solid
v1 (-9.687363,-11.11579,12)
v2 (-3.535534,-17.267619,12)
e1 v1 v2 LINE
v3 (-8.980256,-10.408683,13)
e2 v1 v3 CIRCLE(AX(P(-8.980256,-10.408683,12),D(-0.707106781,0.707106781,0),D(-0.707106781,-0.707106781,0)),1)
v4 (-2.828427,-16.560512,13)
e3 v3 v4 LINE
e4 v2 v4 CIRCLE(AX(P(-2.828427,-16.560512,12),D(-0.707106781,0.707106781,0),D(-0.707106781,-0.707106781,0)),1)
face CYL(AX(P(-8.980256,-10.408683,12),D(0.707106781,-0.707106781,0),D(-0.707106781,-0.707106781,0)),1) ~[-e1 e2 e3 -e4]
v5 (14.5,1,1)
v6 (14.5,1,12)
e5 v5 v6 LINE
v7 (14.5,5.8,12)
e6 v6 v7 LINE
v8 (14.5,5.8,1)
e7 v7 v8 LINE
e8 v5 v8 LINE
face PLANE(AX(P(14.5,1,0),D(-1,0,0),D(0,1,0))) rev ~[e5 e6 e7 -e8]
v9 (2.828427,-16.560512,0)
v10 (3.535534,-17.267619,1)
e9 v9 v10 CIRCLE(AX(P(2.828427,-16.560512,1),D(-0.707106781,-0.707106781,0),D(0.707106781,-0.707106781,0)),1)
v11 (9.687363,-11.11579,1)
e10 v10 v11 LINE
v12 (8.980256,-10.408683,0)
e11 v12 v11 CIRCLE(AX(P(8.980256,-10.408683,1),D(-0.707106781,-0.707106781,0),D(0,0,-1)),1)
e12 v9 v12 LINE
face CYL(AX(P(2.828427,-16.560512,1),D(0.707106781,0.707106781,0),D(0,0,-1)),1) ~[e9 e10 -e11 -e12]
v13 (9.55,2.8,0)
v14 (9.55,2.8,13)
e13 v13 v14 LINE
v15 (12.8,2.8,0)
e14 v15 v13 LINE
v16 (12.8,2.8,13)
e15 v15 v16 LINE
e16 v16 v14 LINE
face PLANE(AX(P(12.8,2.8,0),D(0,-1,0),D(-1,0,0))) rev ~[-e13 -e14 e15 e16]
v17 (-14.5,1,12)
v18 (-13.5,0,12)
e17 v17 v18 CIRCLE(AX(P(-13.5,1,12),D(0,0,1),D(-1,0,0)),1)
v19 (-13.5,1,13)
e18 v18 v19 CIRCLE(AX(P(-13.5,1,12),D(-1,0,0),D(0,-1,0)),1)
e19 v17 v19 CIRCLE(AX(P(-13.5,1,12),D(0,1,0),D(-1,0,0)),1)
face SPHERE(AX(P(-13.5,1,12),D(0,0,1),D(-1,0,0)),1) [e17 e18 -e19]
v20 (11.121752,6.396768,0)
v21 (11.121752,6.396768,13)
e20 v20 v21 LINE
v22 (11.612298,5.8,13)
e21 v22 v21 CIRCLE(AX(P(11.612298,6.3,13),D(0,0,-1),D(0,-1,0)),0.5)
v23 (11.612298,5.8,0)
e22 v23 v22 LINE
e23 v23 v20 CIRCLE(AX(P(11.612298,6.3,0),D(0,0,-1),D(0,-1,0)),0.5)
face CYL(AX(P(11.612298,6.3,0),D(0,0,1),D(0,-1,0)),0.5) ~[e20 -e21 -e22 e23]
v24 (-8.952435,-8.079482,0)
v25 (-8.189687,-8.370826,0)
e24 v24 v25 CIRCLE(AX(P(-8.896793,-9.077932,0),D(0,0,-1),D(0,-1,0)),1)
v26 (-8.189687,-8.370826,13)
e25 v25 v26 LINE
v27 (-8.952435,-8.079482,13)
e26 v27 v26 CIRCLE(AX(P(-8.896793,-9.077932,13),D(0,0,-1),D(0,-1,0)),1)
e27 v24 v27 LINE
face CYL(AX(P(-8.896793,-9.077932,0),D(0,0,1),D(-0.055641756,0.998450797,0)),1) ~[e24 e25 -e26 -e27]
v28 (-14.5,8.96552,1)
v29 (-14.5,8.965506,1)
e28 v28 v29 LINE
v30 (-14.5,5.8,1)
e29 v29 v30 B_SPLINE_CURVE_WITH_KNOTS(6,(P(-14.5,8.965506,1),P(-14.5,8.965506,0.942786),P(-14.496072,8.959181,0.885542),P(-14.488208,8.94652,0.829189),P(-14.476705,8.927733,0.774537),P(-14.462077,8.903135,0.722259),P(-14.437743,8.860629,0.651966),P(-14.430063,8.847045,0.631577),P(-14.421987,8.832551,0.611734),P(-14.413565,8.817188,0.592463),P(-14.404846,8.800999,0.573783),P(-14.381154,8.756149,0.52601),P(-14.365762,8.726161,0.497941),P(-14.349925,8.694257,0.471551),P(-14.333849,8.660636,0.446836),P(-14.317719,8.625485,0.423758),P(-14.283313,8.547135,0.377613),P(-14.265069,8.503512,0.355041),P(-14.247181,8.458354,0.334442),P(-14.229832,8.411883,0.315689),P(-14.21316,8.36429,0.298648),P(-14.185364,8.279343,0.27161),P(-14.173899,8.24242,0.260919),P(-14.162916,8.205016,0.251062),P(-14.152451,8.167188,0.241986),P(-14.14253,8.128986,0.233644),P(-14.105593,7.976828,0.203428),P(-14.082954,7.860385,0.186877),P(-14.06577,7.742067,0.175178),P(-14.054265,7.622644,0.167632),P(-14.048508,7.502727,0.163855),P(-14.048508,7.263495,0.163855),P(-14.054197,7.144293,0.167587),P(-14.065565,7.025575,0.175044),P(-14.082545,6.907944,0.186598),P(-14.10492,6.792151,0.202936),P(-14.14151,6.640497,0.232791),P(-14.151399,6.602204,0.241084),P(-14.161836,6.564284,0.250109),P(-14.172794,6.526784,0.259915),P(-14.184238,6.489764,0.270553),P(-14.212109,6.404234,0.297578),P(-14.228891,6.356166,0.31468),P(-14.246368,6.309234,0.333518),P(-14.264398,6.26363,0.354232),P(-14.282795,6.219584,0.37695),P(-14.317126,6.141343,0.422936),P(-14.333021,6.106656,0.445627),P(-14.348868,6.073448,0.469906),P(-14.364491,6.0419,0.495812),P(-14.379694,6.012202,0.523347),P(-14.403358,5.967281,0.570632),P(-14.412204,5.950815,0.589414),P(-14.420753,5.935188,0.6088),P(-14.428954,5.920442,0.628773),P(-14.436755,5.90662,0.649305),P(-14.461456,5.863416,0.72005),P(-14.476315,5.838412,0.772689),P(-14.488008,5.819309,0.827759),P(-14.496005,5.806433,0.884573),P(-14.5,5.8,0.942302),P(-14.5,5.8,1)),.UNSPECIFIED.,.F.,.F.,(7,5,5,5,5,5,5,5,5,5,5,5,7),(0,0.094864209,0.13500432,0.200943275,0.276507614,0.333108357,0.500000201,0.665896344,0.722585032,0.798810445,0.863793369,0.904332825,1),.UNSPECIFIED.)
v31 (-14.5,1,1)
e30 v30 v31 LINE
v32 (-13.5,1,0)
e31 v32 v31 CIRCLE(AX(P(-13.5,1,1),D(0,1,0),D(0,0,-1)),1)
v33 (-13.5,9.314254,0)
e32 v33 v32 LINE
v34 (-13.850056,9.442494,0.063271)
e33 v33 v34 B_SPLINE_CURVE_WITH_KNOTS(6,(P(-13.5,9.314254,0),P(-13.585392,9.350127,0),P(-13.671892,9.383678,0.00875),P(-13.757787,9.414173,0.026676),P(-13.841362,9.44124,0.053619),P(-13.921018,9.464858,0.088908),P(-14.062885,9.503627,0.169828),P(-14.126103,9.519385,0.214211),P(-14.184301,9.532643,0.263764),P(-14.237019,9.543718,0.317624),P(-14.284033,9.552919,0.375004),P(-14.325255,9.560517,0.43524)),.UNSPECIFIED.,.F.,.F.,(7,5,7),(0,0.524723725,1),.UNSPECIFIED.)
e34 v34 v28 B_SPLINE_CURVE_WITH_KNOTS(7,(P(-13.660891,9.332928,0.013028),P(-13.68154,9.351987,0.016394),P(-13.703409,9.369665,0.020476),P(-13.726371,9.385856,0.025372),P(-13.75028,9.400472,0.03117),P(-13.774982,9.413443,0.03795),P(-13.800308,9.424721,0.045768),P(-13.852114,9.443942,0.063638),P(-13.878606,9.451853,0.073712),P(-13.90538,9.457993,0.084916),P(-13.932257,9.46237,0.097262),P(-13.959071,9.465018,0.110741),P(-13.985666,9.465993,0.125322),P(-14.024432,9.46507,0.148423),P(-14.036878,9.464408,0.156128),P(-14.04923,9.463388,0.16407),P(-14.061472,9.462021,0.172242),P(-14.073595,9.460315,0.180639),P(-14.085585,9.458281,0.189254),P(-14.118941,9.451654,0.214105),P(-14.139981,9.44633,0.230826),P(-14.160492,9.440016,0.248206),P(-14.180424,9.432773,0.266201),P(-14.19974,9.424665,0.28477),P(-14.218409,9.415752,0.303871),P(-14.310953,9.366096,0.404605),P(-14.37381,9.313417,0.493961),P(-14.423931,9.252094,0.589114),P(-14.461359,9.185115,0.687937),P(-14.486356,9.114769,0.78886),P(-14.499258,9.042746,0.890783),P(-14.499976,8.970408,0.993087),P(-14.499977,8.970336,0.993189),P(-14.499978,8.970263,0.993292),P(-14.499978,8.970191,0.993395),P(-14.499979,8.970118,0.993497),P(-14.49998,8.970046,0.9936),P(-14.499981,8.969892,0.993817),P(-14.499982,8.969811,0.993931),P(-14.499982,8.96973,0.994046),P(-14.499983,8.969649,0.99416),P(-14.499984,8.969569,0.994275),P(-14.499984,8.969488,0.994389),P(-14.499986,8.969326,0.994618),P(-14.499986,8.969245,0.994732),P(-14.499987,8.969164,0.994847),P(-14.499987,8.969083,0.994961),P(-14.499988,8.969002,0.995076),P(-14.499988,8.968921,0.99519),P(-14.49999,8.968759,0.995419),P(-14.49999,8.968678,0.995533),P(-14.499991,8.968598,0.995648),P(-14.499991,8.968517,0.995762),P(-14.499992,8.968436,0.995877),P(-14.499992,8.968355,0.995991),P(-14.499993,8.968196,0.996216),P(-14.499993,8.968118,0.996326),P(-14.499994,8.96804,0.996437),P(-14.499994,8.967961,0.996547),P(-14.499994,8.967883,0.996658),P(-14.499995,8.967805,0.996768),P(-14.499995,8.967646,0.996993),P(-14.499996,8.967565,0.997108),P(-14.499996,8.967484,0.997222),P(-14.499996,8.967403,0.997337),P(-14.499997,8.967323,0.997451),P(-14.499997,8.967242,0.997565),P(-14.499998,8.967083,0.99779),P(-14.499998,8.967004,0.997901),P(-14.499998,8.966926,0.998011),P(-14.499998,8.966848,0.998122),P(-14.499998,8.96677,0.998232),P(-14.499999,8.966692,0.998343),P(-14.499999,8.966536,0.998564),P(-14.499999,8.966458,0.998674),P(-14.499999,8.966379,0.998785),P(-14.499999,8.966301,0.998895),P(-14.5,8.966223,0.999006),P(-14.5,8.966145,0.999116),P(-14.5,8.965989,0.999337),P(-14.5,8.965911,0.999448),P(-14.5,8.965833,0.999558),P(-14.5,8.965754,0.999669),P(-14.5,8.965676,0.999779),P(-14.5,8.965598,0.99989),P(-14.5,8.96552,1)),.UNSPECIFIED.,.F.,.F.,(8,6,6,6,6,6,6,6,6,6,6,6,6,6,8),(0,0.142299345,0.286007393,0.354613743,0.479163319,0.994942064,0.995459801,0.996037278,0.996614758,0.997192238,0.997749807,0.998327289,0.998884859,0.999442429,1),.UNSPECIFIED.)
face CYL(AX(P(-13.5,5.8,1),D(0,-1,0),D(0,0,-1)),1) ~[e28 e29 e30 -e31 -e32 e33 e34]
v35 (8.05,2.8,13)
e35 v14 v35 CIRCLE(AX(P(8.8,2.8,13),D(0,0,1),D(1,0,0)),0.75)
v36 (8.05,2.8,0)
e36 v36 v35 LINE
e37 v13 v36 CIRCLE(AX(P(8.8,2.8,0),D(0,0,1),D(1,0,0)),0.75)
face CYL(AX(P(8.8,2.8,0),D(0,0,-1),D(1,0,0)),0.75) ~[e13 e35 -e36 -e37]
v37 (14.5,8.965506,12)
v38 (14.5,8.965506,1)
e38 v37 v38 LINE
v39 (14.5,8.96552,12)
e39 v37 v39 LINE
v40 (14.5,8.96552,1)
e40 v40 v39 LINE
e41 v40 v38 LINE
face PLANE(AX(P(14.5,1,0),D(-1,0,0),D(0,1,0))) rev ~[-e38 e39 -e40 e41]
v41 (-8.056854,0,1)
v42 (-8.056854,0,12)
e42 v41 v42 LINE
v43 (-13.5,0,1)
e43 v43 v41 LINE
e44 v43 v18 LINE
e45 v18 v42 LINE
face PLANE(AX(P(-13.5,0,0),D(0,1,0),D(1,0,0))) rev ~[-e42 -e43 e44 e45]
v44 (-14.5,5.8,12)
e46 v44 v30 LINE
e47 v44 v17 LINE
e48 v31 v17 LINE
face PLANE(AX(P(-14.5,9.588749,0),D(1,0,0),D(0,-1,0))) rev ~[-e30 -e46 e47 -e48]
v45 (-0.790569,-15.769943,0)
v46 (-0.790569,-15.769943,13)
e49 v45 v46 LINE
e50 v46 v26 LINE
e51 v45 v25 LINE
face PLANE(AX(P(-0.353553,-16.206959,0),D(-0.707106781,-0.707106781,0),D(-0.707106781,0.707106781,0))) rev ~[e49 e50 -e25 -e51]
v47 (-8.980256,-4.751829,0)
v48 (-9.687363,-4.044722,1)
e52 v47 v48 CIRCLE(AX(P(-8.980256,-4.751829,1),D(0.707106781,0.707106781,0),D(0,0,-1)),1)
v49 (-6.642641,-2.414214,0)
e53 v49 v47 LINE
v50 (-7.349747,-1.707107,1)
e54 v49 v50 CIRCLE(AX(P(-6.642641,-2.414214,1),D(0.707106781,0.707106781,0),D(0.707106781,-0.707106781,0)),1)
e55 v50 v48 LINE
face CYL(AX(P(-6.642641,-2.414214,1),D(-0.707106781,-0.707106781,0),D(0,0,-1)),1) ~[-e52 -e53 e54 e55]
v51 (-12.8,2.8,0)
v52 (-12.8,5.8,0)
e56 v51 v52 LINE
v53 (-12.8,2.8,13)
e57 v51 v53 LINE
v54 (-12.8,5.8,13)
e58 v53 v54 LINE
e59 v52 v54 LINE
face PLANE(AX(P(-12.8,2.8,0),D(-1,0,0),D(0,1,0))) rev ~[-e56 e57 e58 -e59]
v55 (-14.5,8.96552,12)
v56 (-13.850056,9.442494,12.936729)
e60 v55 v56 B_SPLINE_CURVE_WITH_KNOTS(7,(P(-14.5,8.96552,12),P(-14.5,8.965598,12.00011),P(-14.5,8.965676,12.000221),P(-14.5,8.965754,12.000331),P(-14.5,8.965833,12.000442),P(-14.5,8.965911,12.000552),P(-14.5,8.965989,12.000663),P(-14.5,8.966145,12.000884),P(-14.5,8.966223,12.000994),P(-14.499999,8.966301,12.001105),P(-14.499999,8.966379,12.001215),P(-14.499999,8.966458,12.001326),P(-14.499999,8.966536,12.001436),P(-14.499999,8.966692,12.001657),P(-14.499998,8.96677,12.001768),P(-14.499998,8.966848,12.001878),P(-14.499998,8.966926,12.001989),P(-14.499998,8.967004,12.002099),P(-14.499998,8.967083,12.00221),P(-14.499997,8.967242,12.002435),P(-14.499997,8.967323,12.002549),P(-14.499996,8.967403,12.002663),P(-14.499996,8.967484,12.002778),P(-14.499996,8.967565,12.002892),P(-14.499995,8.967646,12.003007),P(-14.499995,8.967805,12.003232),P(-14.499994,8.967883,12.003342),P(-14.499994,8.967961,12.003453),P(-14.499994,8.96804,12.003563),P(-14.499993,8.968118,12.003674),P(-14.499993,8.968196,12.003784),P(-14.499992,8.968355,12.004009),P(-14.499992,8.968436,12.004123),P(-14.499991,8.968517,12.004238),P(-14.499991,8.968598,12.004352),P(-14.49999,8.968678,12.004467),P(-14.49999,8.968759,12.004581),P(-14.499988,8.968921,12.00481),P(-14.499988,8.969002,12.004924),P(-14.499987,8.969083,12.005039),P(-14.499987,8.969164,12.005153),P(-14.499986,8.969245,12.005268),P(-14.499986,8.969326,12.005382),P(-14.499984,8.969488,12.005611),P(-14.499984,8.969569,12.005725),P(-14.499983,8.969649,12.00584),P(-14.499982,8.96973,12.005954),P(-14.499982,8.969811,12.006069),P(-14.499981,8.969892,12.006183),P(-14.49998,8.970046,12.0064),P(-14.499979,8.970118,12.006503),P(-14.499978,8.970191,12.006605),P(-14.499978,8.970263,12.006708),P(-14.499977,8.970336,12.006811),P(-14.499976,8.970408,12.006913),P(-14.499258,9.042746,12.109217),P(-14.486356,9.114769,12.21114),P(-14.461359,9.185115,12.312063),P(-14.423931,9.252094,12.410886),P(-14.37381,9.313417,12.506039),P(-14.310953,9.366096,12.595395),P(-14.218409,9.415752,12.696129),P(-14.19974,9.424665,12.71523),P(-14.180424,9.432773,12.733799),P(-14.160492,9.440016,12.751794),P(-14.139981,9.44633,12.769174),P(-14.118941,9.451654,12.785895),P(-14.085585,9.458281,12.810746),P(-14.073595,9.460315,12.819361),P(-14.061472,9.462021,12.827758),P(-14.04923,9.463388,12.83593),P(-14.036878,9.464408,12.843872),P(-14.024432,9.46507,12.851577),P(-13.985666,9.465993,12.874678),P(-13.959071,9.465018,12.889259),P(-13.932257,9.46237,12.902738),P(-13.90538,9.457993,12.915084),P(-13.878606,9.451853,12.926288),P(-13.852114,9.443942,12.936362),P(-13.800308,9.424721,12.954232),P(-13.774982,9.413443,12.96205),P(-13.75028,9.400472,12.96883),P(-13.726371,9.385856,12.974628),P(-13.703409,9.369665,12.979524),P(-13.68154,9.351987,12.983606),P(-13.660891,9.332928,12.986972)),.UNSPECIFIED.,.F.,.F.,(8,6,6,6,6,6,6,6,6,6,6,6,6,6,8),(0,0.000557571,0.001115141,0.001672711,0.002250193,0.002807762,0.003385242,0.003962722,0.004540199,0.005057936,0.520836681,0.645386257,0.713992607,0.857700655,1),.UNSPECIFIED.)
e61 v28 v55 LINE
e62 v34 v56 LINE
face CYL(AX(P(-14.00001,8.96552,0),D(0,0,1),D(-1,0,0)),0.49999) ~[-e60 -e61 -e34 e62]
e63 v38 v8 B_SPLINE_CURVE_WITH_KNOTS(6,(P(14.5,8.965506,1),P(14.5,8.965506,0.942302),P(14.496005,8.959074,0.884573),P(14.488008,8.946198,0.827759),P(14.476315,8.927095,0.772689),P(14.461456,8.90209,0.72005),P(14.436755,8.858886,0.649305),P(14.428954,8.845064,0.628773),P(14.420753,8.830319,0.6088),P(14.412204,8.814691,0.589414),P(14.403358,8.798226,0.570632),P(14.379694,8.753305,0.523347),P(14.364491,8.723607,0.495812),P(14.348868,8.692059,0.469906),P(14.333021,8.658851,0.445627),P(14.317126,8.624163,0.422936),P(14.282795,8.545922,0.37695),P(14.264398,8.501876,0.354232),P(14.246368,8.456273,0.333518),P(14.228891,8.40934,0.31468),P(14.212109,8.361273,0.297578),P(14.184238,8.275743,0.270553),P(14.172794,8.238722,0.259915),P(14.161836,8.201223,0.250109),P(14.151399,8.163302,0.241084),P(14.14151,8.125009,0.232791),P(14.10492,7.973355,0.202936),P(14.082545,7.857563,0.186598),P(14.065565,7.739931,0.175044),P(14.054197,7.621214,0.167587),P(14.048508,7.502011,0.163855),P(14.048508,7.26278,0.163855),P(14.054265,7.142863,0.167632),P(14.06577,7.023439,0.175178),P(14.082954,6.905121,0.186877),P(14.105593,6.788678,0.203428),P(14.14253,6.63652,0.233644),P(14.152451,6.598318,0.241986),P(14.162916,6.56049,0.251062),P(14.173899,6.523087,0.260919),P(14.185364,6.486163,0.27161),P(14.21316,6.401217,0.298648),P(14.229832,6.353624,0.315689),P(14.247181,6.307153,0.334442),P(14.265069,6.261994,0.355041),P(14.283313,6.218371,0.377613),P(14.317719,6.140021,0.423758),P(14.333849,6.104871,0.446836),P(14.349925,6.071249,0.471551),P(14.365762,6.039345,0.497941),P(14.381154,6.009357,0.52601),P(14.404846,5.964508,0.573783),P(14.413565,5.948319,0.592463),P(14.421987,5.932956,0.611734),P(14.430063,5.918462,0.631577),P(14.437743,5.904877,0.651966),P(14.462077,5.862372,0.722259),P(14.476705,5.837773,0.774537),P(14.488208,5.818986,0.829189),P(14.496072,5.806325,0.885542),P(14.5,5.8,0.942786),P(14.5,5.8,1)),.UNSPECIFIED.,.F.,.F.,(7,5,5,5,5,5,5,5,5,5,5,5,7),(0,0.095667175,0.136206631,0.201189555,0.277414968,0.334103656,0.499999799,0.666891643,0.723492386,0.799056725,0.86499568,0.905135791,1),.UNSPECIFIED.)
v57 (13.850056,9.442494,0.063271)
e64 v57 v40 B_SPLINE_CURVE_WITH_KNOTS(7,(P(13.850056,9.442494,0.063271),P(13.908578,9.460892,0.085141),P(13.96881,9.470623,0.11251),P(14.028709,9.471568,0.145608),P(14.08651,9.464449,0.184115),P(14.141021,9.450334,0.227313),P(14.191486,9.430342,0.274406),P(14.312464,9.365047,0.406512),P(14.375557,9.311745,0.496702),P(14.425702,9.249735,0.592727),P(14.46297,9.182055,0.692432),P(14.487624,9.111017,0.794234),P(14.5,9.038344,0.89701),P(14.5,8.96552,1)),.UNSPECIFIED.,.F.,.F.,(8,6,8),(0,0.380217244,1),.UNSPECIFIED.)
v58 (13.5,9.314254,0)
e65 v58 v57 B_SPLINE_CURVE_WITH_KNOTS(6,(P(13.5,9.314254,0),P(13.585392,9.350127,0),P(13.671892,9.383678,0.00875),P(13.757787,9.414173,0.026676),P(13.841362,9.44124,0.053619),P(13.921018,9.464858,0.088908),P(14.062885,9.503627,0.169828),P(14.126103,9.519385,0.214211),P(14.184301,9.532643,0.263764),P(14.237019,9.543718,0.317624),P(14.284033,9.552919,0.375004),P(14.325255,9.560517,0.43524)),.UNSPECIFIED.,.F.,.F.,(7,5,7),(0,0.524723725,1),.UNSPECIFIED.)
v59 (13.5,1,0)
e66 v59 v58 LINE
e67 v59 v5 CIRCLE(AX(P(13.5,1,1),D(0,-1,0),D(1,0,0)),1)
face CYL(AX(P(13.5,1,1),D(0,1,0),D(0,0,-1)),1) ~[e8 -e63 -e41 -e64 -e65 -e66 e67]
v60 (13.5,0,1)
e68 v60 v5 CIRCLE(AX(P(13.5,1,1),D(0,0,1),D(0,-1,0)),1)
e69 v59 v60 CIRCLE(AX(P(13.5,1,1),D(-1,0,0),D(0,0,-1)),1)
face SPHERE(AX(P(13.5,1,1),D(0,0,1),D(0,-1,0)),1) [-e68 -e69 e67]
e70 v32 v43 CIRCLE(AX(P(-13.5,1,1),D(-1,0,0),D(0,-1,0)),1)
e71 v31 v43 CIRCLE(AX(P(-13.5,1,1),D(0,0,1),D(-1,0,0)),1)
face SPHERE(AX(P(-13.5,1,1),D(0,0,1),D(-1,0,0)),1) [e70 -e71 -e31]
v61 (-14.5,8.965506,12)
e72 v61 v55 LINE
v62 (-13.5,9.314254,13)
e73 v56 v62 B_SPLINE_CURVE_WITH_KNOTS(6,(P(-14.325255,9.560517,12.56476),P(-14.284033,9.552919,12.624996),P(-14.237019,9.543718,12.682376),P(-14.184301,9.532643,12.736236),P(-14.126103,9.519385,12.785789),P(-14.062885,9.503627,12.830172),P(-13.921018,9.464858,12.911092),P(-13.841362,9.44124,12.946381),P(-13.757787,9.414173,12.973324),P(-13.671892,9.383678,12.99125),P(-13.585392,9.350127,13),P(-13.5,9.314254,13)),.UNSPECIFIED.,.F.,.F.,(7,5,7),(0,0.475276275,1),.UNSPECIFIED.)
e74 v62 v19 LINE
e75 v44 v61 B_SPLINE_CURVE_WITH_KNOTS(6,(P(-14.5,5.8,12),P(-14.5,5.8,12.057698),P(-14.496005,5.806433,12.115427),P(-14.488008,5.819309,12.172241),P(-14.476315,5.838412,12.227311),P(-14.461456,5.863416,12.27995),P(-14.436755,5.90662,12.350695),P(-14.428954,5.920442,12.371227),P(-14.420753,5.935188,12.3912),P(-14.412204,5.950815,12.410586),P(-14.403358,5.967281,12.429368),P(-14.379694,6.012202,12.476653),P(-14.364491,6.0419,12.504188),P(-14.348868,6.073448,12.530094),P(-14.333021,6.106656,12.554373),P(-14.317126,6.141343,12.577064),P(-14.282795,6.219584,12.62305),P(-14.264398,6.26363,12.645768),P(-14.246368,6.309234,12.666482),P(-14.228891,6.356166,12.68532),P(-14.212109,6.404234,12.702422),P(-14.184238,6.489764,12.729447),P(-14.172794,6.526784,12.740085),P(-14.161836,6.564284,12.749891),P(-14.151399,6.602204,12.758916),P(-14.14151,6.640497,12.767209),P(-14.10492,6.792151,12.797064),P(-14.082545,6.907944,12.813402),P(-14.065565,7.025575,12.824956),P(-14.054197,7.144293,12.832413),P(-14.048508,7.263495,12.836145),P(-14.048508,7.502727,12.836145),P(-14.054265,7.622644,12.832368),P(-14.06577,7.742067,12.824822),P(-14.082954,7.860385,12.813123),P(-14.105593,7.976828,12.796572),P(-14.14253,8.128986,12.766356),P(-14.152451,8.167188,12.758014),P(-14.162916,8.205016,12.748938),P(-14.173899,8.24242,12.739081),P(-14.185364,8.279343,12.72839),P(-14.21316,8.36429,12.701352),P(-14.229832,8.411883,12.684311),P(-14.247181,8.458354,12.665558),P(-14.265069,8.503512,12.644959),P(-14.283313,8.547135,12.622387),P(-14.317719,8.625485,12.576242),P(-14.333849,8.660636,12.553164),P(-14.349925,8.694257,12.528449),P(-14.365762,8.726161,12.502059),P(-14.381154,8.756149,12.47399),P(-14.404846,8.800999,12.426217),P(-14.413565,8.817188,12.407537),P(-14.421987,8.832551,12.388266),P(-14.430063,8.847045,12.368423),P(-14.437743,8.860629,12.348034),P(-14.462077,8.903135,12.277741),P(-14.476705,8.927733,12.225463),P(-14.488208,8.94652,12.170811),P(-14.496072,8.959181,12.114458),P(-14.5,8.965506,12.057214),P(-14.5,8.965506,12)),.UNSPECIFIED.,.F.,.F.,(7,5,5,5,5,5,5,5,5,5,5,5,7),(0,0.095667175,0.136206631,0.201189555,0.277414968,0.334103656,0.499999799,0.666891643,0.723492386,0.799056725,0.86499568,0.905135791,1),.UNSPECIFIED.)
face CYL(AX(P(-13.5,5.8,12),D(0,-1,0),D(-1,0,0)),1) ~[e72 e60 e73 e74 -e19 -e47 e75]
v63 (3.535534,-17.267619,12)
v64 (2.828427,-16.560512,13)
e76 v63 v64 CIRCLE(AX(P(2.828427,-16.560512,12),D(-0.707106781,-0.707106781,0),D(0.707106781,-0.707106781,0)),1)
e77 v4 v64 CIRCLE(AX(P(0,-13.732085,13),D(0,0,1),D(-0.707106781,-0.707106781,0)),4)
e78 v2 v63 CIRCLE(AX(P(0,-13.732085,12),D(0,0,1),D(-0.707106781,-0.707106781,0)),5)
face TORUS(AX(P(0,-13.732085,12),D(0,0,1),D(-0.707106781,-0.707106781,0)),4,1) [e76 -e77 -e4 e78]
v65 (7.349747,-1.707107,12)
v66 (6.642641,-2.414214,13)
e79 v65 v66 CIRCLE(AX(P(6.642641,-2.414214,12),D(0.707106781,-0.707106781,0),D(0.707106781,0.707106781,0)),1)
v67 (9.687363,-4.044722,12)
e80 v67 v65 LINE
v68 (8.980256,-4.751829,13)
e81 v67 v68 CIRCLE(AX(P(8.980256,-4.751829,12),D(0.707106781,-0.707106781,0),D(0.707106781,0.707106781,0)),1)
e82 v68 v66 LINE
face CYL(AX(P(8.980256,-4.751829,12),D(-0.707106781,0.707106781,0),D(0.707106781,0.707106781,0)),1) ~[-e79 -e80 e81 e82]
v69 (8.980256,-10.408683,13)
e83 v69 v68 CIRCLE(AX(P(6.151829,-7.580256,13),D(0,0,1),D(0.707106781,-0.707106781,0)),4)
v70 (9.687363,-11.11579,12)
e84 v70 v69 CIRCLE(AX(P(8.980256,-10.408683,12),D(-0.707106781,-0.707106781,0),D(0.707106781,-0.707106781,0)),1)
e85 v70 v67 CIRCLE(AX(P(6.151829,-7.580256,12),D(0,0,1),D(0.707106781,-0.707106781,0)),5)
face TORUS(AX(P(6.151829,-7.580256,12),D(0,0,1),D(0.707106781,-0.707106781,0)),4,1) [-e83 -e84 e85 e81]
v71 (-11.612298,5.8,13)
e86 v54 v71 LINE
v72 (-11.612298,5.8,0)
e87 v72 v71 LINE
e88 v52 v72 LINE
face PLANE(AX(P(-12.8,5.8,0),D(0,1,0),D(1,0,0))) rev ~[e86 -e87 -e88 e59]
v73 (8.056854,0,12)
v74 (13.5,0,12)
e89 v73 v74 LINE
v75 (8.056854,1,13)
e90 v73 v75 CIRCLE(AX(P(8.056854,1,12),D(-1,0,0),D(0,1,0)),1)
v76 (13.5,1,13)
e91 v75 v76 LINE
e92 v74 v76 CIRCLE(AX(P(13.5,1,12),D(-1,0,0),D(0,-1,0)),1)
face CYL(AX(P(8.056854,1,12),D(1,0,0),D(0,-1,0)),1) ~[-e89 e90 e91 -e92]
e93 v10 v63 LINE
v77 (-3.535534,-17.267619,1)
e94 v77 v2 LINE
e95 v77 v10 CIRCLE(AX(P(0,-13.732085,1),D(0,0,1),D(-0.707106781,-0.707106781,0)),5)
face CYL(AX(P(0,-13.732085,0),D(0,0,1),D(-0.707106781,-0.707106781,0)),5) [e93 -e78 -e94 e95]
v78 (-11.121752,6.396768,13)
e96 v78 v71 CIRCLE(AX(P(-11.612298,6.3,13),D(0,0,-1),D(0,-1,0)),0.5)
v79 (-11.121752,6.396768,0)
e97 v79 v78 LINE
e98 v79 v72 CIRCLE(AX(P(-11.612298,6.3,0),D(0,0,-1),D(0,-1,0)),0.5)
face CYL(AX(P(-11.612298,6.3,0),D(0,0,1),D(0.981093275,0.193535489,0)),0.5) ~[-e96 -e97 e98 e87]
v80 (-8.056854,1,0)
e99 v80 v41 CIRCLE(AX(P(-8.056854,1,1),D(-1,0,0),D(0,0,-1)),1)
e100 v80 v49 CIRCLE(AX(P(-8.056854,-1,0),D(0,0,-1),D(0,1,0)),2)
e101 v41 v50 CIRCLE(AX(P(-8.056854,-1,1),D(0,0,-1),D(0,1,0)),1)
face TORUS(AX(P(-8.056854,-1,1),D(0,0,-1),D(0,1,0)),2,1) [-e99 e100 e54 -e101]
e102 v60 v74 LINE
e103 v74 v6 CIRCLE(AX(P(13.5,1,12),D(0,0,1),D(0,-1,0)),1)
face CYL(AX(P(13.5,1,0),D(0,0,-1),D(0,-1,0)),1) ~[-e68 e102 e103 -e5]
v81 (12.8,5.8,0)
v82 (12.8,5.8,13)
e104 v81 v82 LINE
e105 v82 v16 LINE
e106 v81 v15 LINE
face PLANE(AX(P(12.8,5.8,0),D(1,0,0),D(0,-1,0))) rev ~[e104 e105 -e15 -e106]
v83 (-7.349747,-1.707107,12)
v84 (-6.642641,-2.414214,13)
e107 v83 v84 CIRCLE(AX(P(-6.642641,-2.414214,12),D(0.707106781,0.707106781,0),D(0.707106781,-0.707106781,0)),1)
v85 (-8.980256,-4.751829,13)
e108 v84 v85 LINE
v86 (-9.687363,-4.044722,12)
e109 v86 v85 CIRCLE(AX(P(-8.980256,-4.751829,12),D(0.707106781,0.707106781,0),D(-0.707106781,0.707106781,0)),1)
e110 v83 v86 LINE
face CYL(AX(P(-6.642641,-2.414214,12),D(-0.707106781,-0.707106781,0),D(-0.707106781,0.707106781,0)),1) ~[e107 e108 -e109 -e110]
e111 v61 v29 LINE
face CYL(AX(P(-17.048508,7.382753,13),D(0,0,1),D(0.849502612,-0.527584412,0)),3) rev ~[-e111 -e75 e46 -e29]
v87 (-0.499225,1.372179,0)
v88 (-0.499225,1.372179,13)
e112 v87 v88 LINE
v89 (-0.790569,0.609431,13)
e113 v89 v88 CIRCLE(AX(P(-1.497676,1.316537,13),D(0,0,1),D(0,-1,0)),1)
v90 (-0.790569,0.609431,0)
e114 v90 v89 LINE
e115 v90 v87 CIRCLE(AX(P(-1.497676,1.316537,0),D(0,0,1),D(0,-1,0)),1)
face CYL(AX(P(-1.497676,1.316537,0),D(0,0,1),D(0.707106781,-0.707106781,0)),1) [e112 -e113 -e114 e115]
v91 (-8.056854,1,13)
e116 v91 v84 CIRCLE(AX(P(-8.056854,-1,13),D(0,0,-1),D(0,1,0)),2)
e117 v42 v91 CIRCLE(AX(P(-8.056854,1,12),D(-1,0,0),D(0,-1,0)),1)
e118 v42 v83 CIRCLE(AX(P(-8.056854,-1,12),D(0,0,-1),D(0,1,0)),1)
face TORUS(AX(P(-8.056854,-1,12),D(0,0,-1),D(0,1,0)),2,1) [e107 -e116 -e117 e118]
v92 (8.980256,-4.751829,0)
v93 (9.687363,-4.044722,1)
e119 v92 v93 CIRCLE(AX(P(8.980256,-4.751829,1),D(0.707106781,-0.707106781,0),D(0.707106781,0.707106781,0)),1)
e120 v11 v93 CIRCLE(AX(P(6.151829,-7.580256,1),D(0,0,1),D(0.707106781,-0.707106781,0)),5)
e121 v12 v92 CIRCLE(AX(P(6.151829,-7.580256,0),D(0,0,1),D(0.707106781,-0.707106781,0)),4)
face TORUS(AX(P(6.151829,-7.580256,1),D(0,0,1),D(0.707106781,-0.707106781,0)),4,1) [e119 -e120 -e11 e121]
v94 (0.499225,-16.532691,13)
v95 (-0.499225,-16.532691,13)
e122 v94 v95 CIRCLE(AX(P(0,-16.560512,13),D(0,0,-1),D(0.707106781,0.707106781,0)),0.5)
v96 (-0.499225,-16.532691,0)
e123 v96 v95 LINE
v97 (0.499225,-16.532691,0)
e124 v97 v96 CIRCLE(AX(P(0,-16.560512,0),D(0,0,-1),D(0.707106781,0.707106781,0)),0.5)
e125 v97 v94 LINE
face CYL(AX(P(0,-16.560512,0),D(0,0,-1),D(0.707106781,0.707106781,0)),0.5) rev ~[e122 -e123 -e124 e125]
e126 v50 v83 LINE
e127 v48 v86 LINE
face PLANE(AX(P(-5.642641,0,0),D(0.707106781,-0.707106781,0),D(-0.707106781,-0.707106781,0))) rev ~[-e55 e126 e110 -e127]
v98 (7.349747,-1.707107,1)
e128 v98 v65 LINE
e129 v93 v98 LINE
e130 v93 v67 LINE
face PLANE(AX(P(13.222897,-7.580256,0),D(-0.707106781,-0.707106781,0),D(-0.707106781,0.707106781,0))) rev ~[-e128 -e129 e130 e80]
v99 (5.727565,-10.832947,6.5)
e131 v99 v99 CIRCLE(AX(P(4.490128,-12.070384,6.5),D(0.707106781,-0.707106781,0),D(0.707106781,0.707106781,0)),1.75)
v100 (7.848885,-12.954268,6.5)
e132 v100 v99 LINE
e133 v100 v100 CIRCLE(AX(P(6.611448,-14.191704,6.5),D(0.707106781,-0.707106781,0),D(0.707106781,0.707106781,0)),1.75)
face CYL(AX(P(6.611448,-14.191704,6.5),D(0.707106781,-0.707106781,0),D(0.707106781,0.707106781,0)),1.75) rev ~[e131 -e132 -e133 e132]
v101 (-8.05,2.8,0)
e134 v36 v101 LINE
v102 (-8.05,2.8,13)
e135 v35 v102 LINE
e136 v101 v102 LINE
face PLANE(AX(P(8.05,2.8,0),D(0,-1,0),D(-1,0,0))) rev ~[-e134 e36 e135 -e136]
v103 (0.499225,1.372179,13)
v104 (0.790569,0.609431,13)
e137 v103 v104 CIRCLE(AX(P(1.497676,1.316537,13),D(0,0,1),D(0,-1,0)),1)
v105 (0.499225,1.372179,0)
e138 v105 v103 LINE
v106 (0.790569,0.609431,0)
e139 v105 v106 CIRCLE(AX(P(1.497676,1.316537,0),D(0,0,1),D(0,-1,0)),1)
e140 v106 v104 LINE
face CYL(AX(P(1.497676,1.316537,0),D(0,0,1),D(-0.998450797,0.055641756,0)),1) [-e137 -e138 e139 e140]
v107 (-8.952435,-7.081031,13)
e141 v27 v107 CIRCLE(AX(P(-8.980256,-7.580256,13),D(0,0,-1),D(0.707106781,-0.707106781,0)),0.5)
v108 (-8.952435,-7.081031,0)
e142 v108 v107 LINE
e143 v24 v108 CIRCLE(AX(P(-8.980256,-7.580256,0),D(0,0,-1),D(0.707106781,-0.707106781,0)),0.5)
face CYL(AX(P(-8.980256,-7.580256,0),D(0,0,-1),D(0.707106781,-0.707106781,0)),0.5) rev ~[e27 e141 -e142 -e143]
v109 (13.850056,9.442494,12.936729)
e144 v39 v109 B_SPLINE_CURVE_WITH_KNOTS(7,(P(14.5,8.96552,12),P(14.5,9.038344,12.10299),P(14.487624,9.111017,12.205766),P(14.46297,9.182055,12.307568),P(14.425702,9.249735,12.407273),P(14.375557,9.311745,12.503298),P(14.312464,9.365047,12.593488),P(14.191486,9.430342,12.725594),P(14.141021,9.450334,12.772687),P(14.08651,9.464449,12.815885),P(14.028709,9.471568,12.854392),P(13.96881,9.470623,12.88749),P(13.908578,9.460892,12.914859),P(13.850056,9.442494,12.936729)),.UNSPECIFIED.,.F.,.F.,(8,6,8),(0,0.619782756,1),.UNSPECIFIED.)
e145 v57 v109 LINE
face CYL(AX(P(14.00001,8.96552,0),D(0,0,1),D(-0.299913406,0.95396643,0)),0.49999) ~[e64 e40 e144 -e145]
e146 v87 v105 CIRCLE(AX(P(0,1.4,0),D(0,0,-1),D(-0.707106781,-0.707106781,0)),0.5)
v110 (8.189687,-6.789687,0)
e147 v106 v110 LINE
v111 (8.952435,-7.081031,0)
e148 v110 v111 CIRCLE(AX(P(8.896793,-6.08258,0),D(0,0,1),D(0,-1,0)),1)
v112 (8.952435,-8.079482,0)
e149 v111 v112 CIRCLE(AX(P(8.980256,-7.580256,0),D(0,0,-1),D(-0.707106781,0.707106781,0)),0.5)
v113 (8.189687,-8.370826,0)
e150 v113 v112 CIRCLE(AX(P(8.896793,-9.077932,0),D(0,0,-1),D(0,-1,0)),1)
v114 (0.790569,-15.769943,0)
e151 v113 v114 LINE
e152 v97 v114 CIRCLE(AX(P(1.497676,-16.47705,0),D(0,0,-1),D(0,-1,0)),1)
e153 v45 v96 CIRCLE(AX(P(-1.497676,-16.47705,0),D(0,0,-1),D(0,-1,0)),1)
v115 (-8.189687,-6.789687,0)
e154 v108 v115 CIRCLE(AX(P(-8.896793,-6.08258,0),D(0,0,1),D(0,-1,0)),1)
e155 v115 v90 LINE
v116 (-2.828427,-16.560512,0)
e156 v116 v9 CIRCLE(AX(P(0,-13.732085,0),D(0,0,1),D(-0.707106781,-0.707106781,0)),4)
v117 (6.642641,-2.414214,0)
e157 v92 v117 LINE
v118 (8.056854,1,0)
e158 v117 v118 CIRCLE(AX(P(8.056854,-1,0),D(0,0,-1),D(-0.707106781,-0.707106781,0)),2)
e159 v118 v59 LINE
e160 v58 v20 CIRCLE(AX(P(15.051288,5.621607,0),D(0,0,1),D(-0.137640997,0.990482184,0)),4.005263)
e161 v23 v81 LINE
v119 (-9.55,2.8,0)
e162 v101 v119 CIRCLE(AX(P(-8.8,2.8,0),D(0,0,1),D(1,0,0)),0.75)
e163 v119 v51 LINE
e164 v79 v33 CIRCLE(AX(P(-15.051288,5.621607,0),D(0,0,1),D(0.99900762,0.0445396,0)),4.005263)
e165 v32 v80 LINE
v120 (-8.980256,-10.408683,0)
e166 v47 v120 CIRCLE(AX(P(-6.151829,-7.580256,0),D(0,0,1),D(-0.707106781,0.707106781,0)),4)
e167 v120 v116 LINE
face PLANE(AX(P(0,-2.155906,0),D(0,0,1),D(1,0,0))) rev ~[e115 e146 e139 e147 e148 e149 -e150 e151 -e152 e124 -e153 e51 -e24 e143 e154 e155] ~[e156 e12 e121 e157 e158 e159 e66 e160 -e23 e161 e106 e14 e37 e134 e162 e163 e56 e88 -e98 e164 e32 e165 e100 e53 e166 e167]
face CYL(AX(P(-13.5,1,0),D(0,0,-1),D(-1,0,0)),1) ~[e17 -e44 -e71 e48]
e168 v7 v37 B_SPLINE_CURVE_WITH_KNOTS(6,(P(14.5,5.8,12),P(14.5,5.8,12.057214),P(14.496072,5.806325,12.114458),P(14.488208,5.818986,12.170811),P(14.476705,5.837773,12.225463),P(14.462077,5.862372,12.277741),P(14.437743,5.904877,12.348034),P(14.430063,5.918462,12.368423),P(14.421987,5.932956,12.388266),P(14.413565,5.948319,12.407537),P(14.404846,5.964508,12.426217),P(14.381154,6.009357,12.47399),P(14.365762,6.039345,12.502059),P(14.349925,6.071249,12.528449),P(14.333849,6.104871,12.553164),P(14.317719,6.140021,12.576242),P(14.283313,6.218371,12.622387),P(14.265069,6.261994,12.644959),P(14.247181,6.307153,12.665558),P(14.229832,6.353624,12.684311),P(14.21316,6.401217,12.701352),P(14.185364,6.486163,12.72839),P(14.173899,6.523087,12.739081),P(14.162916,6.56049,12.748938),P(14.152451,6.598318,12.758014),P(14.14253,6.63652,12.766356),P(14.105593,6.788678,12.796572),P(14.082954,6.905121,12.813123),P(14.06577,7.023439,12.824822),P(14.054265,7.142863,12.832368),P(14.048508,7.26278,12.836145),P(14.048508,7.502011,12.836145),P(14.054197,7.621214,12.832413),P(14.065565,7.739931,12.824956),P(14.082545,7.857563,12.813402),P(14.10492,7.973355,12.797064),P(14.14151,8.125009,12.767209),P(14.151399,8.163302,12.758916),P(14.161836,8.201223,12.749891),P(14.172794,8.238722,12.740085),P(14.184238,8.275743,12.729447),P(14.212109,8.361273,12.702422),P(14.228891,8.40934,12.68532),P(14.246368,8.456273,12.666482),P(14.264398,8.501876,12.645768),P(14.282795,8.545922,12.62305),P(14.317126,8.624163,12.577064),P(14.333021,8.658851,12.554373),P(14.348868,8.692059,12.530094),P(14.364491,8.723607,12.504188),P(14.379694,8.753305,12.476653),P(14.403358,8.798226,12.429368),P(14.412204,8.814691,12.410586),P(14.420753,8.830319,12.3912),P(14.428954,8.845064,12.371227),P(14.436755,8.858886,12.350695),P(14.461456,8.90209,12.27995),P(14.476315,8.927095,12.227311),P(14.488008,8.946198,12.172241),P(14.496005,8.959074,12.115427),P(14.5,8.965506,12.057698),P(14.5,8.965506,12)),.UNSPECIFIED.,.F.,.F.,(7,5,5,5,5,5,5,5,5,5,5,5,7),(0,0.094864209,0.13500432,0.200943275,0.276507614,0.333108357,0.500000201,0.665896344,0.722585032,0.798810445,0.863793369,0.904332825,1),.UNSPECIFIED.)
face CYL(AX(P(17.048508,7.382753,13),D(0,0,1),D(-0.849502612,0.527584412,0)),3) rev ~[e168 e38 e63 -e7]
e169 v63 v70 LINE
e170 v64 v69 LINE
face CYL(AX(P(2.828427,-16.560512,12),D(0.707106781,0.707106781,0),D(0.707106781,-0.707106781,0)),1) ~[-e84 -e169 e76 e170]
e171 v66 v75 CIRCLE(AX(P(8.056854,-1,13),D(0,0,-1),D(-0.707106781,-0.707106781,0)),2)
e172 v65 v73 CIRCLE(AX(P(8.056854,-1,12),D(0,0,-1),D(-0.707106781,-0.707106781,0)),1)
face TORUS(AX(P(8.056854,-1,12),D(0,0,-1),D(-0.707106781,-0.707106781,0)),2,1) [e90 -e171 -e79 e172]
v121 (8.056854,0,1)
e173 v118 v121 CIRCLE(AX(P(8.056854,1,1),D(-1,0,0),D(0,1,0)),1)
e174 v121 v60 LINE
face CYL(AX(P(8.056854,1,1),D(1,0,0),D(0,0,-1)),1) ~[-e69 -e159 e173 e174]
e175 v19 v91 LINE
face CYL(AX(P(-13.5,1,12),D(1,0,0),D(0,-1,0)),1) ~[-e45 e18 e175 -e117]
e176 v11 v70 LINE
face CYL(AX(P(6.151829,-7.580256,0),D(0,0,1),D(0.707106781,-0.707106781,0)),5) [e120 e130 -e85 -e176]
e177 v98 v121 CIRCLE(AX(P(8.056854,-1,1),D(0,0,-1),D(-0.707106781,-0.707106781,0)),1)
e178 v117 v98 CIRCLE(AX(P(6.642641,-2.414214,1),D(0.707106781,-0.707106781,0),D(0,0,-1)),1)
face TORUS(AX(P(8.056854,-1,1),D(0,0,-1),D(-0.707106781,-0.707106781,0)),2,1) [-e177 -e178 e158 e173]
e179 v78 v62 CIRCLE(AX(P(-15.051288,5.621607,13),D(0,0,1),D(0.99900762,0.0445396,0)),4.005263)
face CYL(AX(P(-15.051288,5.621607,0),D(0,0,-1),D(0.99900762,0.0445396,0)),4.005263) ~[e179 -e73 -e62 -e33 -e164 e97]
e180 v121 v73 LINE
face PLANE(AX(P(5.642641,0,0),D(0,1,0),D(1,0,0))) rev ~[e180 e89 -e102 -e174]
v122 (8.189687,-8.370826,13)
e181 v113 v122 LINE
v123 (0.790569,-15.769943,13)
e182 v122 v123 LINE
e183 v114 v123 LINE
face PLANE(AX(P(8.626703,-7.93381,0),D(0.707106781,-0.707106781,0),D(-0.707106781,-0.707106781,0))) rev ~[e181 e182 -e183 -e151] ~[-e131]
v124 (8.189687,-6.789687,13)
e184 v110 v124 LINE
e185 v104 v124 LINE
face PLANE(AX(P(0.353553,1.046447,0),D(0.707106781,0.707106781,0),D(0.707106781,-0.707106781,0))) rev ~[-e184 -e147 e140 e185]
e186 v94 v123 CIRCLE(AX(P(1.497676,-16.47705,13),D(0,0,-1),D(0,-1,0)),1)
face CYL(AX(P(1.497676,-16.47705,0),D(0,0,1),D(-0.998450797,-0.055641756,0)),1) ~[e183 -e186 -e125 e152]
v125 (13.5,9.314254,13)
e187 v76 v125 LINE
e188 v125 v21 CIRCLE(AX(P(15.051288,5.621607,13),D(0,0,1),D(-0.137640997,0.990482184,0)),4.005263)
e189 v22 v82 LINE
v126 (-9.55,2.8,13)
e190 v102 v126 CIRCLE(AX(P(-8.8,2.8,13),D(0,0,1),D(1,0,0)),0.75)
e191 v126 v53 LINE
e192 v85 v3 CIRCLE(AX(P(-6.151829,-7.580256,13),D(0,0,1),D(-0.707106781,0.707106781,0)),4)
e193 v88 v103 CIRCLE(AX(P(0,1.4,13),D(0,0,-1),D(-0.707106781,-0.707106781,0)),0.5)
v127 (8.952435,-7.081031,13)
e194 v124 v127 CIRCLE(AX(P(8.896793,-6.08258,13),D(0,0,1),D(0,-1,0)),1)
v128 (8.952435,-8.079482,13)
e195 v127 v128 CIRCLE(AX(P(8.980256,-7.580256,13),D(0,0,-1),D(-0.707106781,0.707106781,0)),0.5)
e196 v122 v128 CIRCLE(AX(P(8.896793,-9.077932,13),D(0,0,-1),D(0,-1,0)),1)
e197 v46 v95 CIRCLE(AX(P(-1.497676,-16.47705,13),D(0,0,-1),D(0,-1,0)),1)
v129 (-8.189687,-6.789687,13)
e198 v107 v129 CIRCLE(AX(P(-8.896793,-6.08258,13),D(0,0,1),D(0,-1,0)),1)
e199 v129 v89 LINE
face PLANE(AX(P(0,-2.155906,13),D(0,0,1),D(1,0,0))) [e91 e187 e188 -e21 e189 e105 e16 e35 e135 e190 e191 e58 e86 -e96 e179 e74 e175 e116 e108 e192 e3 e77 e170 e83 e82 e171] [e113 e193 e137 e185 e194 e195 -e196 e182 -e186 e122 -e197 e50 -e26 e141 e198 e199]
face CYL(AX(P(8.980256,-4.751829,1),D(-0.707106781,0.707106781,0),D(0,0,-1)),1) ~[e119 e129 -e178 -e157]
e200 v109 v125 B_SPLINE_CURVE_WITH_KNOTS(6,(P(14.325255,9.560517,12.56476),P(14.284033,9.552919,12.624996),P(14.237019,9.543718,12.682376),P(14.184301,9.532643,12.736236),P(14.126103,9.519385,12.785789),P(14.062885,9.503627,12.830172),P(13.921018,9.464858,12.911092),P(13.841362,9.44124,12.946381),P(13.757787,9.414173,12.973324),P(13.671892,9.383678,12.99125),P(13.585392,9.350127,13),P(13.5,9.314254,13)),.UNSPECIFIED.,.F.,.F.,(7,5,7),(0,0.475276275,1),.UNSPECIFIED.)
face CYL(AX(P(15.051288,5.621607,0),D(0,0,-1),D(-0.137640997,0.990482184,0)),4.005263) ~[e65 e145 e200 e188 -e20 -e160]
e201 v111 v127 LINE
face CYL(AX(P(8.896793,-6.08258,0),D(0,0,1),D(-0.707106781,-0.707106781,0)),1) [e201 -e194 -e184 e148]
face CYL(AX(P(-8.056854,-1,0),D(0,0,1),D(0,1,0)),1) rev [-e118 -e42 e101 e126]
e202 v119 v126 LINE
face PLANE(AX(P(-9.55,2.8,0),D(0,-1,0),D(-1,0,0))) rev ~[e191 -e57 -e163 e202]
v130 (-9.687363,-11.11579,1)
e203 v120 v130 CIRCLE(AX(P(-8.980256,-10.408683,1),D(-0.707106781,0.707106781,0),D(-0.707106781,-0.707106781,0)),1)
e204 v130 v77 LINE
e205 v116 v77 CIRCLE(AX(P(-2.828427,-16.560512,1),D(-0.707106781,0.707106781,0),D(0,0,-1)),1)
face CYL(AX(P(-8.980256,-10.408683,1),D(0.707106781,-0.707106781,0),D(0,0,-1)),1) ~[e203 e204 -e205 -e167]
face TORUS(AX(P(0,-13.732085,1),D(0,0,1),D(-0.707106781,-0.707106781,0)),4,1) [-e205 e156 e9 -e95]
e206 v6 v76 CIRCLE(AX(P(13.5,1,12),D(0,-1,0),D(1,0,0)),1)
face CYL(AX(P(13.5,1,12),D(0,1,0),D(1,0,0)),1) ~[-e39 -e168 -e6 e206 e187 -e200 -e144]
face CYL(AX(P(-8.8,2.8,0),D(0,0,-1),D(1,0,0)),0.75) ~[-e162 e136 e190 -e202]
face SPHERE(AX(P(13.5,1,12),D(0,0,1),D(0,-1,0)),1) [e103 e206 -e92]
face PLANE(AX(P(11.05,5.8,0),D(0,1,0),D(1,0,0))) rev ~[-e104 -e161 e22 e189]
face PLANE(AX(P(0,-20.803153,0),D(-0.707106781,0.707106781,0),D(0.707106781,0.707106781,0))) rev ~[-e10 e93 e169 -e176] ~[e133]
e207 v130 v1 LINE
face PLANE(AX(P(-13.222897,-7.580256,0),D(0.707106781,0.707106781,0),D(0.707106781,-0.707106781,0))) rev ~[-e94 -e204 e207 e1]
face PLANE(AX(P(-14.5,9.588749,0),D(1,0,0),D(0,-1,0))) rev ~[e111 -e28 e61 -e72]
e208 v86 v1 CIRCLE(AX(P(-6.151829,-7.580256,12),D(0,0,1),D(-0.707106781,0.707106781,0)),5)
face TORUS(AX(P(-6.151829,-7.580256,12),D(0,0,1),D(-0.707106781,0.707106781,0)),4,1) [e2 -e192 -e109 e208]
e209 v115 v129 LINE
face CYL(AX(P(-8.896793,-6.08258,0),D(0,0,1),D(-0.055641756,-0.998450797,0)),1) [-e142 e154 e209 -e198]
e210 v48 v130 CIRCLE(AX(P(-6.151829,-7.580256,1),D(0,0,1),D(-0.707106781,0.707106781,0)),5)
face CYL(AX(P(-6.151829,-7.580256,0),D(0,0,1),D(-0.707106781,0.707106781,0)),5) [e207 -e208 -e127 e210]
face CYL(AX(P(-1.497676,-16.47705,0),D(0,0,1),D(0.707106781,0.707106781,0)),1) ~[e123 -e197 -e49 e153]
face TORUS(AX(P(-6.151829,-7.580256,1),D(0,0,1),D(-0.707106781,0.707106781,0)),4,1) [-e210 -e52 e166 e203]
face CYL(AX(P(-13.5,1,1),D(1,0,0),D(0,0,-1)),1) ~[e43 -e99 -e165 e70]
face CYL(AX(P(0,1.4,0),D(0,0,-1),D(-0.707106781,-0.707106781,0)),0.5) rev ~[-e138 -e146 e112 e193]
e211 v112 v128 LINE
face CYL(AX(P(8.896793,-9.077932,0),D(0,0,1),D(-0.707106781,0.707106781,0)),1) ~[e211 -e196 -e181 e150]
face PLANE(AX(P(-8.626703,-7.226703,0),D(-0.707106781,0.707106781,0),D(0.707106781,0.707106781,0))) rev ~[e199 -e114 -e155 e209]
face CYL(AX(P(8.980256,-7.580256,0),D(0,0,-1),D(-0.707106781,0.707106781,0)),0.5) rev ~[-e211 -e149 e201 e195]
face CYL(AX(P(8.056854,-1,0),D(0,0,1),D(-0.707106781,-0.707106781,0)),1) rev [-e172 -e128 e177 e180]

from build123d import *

# Parameters (mm, degrees)
F1_DEPTH  = 13
F4_DEPTH  = 13.001
F5_R      = 0.49999
F6_R      = 1
F7_R      = 5
F8_R      = 1
F9_R      = 0.5
F10_R     = 1
F11_R     = 1.75
F12_DEPTH = 15.6999998824


# Not quite as in the source:
# - a fillet or chamfer is up to 0.001 mm smaller than in the source, because OpenCascade refuses the exact size


with BuildPart() as f1:
    # F0 (on Top) → F1 (new body)
    with BuildSketch(Plane.XY):
        with BuildLine():
            ThreePointArc((-14.5, 1), (-14.2071067812, 0.2928932188), (-13.5, 0))
            Line((-13.5, 0), (-5.6426405208, 0))
            Line((-5.6426405208, 0), (-13.2228966419, -7.5802561211))
            Line((-13.2228966419, -7.5802561211), (0, -20.803152763))
            Line((0, -20.803152763), (13.2228966419, -7.5802561211))
            Line((13.2228966419, -7.5802561211), (5.6426405208, 0))
            Line((5.6426405208, 0), (13.5, 0))
            ThreePointArc((13.5, 0), (14.2071067812, 0.2928932188), (14.5, 1))
            Line((14.5, 1), (14.5, 9.5887489808))
            ThreePointArc((14.5, 9.5887489808), (12.0898455808, 8.3182698074), (11.05, 5.8))
            Line((11.05, 5.8), (12.8, 5.8))
            Line((12.8, 5.8), (12.8, 2.8))
            Line((12.8, 2.8), (9.55, 2.8))
            ThreePointArc((9.55, 2.8), (8.8, 3.55), (8.05, 2.8))
            Line((8.05, 2.8), (-8.05, 2.8))
            ThreePointArc((-8.05, 2.8), (-8.8, 3.55), (-9.55, 2.8))
            Line((-9.55, 2.8), (-12.8, 2.8))
            Line((-12.8, 2.8), (-12.8, 5.8))
            Line((-12.8, 5.8), (-11.05, 5.8))
            ThreePointArc((-11.05, 5.8), (-12.0898455808, 8.3182698074), (-14.5, 9.5887489808))
            Line((-14.5, 9.5887489808), (-14.5, 1))
        make_face()
        with BuildLine():
            Line((-8.6267027305, -7.2267027305), (-0.3535533906, 1.0464466094))
            ThreePointArc((-0.3535533906, 1.0464466094), (0, 1.9), (0.3535533906, 1.0464466094))
            Line((0.3535533906, 1.0464466094), (8.6267027305, -7.2267027305))
            ThreePointArc((8.6267027305, -7.2267027305), (9.4802561211, -7.5802561211), (8.6267027305, -7.9338095117))
            Line((8.6267027305, -7.9338095117), (0.3535533906, -16.2069588515))
            ThreePointArc((0.3535533906, -16.2069588515), (0, -17.0605122421), (-0.3535533906, -16.2069588515))
            Line((-0.3535533906, -16.2069588515), (-8.6267027305, -7.9338095117))
            ThreePointArc((-8.6267027305, -7.9338095117), (-9.4802561211, -7.5802561211), (-8.6267027305, -7.2267027305))
        make_face(mode=Mode.SUBTRACT)
    extrude(amount=F1_DEPTH)

    # F3 (on face) → F4 (cut, through all)
    with BuildSketch(Plane.XY.offset(13)):
        with BuildLine():
            ThreePointArc((-14.5, 5.8), (-14.0485078359, 7.3827532374), (-14.5, 8.9655064748))
            Line((-14.5, 8.9655064748), (-14.5, 5.8))
        make_face()
        with BuildLine():
            Line((14.5, 5.8), (14.5, 8.9655064748))
            ThreePointArc((14.5, 8.9655064748), (14.0485078359, 7.3827532374), (14.5, 5.8))
        make_face()
    extrude(amount=-F4_DEPTH, mode=Mode.SUBTRACT)

    # F5 (radius 0.5 in the source; OpenCascade refuses exactly that, so slightly less here)
    f5_edges = [f1.edges().sort_by_distance(p)[0] for p in [
        (-14.5, 9.588749, 6.5),
        (14.5, 9.588749, 6.5),
    ]]
    fillet(f5_edges, radius=F5_R)

    # F6
    f6_edges = [f1.edges().sort_by_distance(p)[0] for p in [
        (-5.642641, 0, 6.5),
        (5.642641, 0, 6.5),
    ]]
    fillet(f6_edges, radius=F6_R)

    # F7
    f7_edges = [f1.edges().sort_by_distance(p)[0] for p in [
        (-13.222897, -7.580256, 6.5),
        (0, -20.803153, 6.5),
        (13.222897, -7.580256, 6.5),
    ]]
    fillet(f7_edges, radius=F7_R)

    # F8
    f8_edges = [f1.edges().sort_by_distance(p)[0] for p in [
        (-6.611448, -14.191704, 13),
        (-6.611448, -14.191704, 0),
    ]]
    fillet(f8_edges, radius=F8_R)

    # F9
    f9_edges = [f1.edges().sort_by_distance(p)[0] for p in [
        (-11.05, 5.8, 6.5),
        (11.05, 5.8, 6.5),
    ]]
    fillet(f9_edges, radius=F9_R)

    # F10
    f10_edges = [f1.edges().sort_by_distance(p)[0] for p in [
        (-0.353553, 1.046447, 6.5),
        (0.353553, 1.046447, 6.5),
        (-8.626703, -7.226703, 6.5),
        (-8.626703, -7.93381, 6.5),
        (-0.353553, -16.206959, 6.5),
        (0.353553, -16.206959, 6.5),
        (8.626703, -7.226703, 6.5),
        (8.626703, -7.93381, 6.5),
    ]]
    fillet(f10_edges, radius=F10_R)

    # F11 (on face) → F12 (cut, through all)
    with BuildSketch(Plane(origin=(10.4015763815, -10.4015763815, 0), x_dir=(0.7071067812, 0.7071067812, 0), z_dir=(0.7071067812, -0.7071067812, 0))):
        with Locations((-5.3600505063, 6.5)):
            Circle(F11_R)
    extrude(amount=-F12_DEPTH, mode=Mode.SUBTRACT)


solid = f1.part
